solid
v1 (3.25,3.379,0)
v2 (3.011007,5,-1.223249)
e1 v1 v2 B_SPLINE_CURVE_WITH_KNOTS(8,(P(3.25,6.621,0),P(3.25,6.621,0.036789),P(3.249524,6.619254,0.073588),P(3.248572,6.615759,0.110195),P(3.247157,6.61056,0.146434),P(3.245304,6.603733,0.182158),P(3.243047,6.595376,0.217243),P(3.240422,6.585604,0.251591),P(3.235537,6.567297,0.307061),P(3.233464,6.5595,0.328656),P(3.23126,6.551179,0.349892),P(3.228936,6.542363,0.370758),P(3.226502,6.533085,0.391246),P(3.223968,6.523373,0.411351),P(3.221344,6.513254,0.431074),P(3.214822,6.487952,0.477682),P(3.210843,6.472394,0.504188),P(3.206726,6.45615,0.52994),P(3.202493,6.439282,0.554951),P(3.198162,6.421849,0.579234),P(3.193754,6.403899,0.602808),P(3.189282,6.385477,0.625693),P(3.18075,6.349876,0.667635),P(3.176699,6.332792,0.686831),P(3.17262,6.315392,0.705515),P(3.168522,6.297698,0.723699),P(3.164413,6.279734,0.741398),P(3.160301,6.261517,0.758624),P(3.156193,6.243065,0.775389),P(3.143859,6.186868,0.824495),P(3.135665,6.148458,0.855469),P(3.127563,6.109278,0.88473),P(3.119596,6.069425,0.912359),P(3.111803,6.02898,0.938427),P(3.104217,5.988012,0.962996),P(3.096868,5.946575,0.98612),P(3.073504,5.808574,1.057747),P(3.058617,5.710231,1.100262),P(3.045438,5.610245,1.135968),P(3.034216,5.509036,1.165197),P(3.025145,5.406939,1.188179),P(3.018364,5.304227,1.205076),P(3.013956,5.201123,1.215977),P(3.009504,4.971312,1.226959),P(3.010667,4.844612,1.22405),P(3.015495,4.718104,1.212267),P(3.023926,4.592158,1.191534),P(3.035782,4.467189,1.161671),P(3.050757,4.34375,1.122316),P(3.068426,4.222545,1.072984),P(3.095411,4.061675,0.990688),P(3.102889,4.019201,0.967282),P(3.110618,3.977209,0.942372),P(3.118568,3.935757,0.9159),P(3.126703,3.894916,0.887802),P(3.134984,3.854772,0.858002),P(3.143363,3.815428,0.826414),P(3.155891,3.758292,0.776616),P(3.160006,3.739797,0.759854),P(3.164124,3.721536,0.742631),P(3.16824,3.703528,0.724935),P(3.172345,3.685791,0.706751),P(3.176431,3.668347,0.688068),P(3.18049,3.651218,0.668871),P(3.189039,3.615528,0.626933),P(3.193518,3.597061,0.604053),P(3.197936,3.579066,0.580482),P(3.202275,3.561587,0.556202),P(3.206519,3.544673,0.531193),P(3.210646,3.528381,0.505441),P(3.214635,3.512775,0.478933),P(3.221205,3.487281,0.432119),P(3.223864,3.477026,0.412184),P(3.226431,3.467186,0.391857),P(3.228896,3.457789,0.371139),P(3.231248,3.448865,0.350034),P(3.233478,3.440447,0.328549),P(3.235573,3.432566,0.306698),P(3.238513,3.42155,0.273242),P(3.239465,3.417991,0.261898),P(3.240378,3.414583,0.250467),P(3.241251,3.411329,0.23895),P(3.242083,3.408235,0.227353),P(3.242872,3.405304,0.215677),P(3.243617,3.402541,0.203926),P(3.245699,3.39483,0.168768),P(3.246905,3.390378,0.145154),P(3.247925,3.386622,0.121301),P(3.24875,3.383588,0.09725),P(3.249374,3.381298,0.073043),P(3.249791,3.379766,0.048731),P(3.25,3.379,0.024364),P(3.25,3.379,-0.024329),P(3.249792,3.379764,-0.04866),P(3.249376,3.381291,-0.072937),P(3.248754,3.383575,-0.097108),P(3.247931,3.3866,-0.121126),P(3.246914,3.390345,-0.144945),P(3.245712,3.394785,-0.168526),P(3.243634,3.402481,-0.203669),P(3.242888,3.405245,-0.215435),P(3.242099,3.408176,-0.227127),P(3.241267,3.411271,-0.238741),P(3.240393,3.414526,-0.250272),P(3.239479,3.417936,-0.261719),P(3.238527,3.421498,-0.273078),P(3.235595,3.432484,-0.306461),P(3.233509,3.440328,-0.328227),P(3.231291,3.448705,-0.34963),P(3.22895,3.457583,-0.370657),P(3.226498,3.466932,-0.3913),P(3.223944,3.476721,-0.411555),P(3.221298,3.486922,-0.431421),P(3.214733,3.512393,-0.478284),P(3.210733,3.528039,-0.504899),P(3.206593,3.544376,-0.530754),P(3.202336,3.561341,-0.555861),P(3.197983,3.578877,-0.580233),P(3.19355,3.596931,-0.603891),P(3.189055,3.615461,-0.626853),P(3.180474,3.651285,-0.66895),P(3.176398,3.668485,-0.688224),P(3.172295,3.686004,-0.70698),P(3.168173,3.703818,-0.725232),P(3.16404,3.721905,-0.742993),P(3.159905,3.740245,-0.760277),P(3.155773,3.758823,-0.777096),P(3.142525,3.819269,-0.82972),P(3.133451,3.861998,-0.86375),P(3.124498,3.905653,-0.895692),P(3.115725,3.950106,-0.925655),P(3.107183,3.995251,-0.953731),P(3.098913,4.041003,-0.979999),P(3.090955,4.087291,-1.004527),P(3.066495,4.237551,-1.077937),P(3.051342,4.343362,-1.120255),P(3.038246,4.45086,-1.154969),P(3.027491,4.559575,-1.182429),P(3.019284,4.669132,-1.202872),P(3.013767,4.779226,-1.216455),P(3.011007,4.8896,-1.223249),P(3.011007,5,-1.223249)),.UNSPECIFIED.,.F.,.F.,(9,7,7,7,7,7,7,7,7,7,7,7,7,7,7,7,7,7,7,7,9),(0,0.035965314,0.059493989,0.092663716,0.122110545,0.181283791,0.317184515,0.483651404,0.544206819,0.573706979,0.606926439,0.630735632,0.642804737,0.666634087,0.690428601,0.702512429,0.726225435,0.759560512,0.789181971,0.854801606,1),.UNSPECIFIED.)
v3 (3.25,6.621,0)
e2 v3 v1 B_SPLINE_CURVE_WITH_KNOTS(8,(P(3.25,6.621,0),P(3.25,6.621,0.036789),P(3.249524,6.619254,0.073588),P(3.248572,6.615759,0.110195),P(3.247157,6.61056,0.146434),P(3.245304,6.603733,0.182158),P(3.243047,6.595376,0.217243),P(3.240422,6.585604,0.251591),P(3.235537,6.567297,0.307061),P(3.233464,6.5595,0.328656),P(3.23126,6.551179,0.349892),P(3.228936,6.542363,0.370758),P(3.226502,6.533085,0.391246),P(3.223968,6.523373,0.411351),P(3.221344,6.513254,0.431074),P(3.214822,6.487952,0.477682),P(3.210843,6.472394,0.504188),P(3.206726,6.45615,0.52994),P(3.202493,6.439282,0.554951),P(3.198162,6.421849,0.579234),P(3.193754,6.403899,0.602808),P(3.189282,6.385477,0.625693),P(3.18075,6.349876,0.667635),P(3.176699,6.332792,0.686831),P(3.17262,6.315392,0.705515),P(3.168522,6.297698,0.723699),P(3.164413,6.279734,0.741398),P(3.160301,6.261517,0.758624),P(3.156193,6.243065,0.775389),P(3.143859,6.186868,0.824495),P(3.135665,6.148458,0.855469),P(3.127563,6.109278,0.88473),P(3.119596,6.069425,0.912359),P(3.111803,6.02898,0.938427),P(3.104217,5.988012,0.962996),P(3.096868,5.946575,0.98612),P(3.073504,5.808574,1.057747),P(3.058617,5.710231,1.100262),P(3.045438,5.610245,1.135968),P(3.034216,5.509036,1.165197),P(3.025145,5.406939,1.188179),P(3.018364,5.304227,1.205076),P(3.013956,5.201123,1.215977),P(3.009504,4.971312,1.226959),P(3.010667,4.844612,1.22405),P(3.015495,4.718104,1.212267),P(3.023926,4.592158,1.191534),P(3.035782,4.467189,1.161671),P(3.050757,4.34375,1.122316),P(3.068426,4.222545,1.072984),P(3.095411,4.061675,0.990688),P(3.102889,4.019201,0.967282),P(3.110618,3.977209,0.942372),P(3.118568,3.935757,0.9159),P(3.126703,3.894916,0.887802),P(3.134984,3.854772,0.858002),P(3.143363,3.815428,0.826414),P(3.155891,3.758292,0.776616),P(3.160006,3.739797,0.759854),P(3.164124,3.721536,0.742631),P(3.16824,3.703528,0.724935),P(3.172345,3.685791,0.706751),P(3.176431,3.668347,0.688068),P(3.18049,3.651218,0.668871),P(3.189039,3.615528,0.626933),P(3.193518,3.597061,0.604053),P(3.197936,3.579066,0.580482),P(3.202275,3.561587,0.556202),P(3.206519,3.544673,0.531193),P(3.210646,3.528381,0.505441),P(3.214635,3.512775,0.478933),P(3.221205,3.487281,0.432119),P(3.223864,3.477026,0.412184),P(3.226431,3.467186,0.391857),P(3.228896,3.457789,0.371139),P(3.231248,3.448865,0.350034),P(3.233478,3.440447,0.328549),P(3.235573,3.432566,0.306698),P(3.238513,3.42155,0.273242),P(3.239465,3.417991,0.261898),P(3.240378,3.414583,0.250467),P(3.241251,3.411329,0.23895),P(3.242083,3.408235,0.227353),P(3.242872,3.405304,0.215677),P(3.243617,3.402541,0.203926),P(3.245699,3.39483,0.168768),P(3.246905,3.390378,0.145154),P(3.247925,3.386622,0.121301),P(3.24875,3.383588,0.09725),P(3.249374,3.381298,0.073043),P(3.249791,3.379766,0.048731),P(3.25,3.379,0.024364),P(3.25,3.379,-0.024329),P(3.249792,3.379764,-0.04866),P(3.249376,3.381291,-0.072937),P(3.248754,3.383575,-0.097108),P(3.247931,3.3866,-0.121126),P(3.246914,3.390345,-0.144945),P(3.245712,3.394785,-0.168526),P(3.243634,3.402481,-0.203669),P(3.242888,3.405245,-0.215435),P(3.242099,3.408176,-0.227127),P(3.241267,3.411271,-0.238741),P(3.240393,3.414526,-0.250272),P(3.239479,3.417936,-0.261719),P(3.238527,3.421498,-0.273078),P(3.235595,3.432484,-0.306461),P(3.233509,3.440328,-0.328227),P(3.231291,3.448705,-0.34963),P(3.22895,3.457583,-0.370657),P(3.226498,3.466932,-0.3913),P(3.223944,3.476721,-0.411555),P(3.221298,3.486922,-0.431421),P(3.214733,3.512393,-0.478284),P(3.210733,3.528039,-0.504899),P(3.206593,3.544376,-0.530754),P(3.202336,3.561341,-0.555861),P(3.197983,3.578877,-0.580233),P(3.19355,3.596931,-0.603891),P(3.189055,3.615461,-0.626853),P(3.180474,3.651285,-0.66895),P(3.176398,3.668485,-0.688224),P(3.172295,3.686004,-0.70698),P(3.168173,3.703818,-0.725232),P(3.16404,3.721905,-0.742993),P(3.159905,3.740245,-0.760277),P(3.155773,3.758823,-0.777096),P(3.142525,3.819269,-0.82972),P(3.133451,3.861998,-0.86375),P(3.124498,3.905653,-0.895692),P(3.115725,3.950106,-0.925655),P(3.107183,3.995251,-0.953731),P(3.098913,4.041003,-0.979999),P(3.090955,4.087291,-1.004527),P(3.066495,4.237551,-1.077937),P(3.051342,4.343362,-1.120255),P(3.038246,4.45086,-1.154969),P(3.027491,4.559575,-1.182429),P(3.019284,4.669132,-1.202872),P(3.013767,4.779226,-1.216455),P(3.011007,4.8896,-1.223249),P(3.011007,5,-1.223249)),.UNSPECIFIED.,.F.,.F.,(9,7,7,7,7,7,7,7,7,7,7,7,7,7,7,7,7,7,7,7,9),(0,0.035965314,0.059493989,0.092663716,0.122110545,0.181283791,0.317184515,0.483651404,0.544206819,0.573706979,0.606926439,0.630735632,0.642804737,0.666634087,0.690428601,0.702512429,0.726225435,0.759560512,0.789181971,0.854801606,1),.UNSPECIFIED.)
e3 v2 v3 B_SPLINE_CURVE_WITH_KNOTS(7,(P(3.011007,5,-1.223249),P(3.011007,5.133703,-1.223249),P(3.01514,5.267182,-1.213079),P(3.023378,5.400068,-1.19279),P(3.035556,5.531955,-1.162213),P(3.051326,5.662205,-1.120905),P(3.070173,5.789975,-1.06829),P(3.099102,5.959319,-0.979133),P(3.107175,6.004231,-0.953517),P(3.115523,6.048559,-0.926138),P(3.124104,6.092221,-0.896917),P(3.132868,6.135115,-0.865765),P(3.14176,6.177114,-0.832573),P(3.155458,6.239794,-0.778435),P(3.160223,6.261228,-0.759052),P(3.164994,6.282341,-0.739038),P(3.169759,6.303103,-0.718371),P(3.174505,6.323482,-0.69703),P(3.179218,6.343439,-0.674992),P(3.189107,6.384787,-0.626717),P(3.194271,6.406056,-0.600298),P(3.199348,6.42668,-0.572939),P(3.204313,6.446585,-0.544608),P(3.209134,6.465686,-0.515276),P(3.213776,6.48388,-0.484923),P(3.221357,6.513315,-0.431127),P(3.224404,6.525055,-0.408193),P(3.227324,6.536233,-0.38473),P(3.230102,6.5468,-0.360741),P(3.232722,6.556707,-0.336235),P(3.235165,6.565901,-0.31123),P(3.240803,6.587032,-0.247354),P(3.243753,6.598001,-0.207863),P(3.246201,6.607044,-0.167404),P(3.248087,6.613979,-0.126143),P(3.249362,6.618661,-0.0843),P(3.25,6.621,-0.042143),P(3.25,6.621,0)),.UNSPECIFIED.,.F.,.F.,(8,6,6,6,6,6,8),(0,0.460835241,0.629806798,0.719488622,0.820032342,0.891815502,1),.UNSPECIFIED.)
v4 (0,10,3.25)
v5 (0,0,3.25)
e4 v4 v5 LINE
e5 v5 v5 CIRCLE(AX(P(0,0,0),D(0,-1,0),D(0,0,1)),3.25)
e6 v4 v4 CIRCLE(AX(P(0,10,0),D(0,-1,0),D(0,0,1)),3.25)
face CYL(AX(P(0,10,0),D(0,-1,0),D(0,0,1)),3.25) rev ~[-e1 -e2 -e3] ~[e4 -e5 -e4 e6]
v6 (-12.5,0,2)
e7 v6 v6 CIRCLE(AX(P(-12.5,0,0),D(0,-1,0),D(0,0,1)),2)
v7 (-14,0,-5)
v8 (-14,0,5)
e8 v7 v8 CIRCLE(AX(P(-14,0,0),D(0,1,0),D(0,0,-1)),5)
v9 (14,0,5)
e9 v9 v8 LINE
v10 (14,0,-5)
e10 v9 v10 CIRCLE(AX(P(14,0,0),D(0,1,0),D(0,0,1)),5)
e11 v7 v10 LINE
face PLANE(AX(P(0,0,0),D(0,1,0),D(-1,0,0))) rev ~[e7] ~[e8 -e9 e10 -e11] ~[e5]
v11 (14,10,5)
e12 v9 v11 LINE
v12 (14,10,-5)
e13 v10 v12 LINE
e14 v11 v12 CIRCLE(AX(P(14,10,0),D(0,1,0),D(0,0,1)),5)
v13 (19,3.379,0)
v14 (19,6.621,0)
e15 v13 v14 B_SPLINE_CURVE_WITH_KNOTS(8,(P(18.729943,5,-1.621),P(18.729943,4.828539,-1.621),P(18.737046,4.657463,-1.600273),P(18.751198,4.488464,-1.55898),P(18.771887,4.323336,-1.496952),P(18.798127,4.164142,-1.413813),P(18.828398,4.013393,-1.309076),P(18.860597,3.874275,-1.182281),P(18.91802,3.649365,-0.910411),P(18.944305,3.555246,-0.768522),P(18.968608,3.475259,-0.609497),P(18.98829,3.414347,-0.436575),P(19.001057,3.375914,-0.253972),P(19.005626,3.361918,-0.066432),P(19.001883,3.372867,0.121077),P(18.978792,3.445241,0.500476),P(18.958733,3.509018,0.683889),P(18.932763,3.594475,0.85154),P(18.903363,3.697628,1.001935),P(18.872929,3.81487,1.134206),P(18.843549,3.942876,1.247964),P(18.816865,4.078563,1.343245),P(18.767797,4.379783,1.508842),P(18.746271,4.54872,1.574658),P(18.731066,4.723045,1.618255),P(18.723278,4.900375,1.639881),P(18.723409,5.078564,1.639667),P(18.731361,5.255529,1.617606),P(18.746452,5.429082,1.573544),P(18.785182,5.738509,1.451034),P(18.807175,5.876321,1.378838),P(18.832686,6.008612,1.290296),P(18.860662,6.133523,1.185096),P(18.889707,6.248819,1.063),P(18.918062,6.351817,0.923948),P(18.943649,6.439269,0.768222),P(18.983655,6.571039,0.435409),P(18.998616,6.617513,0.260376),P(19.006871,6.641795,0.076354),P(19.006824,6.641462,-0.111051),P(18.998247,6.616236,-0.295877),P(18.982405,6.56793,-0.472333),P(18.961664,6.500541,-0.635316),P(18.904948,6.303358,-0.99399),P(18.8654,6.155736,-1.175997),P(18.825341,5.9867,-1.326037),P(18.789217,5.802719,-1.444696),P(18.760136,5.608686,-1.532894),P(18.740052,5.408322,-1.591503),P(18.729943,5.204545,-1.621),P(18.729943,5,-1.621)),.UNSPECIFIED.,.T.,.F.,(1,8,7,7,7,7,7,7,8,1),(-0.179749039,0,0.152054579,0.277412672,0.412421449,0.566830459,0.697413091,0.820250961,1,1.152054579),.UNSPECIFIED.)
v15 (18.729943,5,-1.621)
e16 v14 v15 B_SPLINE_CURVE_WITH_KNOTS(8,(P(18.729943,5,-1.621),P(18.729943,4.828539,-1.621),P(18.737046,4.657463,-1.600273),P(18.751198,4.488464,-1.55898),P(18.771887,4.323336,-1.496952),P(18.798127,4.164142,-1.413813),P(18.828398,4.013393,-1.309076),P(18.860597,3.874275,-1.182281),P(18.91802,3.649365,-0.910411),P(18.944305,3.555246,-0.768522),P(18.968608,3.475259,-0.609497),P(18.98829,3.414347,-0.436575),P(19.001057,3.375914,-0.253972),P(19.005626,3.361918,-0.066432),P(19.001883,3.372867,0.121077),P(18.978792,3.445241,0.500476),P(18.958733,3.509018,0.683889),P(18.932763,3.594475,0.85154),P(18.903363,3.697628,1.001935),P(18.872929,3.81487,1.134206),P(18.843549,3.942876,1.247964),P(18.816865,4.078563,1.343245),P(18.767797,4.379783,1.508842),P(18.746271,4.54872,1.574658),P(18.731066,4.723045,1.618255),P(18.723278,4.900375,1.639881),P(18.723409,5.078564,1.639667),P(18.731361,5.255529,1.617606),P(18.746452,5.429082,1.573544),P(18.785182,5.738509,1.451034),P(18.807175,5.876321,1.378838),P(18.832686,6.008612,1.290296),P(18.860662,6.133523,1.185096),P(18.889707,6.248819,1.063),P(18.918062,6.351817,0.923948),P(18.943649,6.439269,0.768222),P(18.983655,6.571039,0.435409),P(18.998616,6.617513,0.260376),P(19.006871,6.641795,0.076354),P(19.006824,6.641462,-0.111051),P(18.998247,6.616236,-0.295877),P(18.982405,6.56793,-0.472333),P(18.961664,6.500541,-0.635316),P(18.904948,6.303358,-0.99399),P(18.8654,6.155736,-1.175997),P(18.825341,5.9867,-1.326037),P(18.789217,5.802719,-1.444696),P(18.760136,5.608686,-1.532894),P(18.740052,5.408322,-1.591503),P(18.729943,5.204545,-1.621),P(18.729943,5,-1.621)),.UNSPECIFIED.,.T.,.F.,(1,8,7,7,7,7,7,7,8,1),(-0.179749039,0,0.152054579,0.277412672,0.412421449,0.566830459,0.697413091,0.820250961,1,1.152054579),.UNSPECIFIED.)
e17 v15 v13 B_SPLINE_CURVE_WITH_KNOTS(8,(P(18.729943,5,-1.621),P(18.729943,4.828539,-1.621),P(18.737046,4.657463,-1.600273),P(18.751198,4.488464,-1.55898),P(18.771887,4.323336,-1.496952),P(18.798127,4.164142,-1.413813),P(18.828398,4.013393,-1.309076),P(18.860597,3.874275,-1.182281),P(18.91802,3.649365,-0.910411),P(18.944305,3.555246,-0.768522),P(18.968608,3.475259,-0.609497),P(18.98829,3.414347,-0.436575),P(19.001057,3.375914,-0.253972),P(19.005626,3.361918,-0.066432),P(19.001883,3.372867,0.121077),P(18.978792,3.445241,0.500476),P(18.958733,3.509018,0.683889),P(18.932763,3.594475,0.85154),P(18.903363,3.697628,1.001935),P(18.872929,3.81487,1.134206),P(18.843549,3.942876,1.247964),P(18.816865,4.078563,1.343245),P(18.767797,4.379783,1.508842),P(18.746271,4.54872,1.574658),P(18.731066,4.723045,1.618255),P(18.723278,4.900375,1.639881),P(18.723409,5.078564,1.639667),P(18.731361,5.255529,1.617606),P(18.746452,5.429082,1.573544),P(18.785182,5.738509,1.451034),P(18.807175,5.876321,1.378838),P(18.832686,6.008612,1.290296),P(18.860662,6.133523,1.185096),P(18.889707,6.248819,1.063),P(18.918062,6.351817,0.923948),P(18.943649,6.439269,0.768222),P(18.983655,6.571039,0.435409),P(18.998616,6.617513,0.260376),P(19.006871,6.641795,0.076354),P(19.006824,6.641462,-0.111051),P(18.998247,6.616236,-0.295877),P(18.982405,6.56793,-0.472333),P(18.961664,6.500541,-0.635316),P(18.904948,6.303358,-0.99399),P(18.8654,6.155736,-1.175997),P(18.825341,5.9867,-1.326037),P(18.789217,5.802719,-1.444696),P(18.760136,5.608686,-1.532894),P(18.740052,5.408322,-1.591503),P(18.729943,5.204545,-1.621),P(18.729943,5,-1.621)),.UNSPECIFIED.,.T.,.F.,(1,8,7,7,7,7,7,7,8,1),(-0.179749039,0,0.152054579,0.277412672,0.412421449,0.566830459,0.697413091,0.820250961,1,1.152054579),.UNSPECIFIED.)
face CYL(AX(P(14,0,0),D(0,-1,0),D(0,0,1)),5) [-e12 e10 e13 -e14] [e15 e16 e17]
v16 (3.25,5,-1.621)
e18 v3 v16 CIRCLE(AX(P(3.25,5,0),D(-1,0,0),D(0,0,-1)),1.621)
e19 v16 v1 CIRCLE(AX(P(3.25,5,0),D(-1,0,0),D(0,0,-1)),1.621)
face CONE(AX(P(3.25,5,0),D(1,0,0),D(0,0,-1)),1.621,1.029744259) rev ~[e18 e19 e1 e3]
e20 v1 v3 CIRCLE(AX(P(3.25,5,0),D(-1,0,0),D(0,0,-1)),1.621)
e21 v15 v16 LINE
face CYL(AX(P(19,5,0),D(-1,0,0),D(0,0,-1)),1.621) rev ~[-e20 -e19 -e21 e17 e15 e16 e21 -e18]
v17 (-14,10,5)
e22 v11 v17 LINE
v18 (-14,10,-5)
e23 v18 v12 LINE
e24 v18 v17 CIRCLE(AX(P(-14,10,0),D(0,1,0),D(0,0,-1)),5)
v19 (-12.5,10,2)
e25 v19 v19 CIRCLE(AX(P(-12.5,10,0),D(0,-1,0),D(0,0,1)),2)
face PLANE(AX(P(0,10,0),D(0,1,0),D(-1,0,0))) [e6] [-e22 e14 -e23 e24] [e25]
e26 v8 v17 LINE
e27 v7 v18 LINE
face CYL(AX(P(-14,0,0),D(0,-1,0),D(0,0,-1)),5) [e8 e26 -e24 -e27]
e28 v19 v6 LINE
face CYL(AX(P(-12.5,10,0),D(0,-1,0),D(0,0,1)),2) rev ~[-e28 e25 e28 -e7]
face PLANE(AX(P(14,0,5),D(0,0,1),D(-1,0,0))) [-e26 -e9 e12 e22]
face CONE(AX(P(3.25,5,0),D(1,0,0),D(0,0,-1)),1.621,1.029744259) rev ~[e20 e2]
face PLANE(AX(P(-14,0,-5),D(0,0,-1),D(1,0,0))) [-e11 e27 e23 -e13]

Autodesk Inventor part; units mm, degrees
ref_plane "XZ Plane" through (0, 0, 0) normal (0, 1, 0) x (-1, 0, 0)
ref_plane "XY Plane" through (0, 0, 0) normal (0, 0, 1) x (1, 0, 0)
sketch "Skizze1" plane through (0, 0, 0) normal (0, 1, 0) x (-1, 0, 0)
  line L0 (14, 0) -> (-14, 0) construction
  line L1 (14, -5) -> (-14, -5)
  line L2 (-14, 5) -> (14, 5)
  arc A0 (14, -5) -> (14, 5) centre (14, 0) ccw
  arc A1 (-14, 5) -> (-14, -5) centre (-14, 0) ccw
  point P0 (0, 0)
  point P1 (0, 0)
  point P2 (-19, 0)
  point P3 (19, 0)
  dimension "d1" = 38
  dimension "d2" = 5
extrude "Extrusion1" add sketch "Skizze1" along normal blind 10
sketch "Skizze2" plane through (0, 10, 0) normal (0, 1, 0) x (1, 0, 0)
  point P0 (0, 0)
  point P1 (0, 0)
hole "Bohrung1" at (0, 10, 0) direction (0, -1, 0) diameter 6.5 depth 10
sketch "Skizze3" plane through (0, 10, 0) normal (0, 1, 0) x (1, 0, 0)
  point P0 (0, 0)
  point P1 (-12.5, 0)
  dimension "d19" = 12.5
hole "Bohrung2" at (-12.5, 10, 0) direction (0, -1, 0) diameter 4 end through all
ref_plane "Arbeitsebene1" through (19, 0, 0) normal (1, 0, 0) x (0, 1, 0)
sketch "Skizze4" plane through (19, 0, 0) normal (1, 0, 0) x (0, 1, 0)
  line L0 (0, -5) -> (0, 5) projected
  point P0 (0, 0)
  point P1 (5, 0)
  point P2 (0, 0)
  dimension "d21" = 5
hole "Bohrung3" at (19, 5, 0) direction (-1, 0, 0) diameter 3.242 depth 15.75 tip angle 118 thread size "M4x0.7" class "6H" standard "ISO Metric profile"
properties part number "BMS_small" material "Gummi"
